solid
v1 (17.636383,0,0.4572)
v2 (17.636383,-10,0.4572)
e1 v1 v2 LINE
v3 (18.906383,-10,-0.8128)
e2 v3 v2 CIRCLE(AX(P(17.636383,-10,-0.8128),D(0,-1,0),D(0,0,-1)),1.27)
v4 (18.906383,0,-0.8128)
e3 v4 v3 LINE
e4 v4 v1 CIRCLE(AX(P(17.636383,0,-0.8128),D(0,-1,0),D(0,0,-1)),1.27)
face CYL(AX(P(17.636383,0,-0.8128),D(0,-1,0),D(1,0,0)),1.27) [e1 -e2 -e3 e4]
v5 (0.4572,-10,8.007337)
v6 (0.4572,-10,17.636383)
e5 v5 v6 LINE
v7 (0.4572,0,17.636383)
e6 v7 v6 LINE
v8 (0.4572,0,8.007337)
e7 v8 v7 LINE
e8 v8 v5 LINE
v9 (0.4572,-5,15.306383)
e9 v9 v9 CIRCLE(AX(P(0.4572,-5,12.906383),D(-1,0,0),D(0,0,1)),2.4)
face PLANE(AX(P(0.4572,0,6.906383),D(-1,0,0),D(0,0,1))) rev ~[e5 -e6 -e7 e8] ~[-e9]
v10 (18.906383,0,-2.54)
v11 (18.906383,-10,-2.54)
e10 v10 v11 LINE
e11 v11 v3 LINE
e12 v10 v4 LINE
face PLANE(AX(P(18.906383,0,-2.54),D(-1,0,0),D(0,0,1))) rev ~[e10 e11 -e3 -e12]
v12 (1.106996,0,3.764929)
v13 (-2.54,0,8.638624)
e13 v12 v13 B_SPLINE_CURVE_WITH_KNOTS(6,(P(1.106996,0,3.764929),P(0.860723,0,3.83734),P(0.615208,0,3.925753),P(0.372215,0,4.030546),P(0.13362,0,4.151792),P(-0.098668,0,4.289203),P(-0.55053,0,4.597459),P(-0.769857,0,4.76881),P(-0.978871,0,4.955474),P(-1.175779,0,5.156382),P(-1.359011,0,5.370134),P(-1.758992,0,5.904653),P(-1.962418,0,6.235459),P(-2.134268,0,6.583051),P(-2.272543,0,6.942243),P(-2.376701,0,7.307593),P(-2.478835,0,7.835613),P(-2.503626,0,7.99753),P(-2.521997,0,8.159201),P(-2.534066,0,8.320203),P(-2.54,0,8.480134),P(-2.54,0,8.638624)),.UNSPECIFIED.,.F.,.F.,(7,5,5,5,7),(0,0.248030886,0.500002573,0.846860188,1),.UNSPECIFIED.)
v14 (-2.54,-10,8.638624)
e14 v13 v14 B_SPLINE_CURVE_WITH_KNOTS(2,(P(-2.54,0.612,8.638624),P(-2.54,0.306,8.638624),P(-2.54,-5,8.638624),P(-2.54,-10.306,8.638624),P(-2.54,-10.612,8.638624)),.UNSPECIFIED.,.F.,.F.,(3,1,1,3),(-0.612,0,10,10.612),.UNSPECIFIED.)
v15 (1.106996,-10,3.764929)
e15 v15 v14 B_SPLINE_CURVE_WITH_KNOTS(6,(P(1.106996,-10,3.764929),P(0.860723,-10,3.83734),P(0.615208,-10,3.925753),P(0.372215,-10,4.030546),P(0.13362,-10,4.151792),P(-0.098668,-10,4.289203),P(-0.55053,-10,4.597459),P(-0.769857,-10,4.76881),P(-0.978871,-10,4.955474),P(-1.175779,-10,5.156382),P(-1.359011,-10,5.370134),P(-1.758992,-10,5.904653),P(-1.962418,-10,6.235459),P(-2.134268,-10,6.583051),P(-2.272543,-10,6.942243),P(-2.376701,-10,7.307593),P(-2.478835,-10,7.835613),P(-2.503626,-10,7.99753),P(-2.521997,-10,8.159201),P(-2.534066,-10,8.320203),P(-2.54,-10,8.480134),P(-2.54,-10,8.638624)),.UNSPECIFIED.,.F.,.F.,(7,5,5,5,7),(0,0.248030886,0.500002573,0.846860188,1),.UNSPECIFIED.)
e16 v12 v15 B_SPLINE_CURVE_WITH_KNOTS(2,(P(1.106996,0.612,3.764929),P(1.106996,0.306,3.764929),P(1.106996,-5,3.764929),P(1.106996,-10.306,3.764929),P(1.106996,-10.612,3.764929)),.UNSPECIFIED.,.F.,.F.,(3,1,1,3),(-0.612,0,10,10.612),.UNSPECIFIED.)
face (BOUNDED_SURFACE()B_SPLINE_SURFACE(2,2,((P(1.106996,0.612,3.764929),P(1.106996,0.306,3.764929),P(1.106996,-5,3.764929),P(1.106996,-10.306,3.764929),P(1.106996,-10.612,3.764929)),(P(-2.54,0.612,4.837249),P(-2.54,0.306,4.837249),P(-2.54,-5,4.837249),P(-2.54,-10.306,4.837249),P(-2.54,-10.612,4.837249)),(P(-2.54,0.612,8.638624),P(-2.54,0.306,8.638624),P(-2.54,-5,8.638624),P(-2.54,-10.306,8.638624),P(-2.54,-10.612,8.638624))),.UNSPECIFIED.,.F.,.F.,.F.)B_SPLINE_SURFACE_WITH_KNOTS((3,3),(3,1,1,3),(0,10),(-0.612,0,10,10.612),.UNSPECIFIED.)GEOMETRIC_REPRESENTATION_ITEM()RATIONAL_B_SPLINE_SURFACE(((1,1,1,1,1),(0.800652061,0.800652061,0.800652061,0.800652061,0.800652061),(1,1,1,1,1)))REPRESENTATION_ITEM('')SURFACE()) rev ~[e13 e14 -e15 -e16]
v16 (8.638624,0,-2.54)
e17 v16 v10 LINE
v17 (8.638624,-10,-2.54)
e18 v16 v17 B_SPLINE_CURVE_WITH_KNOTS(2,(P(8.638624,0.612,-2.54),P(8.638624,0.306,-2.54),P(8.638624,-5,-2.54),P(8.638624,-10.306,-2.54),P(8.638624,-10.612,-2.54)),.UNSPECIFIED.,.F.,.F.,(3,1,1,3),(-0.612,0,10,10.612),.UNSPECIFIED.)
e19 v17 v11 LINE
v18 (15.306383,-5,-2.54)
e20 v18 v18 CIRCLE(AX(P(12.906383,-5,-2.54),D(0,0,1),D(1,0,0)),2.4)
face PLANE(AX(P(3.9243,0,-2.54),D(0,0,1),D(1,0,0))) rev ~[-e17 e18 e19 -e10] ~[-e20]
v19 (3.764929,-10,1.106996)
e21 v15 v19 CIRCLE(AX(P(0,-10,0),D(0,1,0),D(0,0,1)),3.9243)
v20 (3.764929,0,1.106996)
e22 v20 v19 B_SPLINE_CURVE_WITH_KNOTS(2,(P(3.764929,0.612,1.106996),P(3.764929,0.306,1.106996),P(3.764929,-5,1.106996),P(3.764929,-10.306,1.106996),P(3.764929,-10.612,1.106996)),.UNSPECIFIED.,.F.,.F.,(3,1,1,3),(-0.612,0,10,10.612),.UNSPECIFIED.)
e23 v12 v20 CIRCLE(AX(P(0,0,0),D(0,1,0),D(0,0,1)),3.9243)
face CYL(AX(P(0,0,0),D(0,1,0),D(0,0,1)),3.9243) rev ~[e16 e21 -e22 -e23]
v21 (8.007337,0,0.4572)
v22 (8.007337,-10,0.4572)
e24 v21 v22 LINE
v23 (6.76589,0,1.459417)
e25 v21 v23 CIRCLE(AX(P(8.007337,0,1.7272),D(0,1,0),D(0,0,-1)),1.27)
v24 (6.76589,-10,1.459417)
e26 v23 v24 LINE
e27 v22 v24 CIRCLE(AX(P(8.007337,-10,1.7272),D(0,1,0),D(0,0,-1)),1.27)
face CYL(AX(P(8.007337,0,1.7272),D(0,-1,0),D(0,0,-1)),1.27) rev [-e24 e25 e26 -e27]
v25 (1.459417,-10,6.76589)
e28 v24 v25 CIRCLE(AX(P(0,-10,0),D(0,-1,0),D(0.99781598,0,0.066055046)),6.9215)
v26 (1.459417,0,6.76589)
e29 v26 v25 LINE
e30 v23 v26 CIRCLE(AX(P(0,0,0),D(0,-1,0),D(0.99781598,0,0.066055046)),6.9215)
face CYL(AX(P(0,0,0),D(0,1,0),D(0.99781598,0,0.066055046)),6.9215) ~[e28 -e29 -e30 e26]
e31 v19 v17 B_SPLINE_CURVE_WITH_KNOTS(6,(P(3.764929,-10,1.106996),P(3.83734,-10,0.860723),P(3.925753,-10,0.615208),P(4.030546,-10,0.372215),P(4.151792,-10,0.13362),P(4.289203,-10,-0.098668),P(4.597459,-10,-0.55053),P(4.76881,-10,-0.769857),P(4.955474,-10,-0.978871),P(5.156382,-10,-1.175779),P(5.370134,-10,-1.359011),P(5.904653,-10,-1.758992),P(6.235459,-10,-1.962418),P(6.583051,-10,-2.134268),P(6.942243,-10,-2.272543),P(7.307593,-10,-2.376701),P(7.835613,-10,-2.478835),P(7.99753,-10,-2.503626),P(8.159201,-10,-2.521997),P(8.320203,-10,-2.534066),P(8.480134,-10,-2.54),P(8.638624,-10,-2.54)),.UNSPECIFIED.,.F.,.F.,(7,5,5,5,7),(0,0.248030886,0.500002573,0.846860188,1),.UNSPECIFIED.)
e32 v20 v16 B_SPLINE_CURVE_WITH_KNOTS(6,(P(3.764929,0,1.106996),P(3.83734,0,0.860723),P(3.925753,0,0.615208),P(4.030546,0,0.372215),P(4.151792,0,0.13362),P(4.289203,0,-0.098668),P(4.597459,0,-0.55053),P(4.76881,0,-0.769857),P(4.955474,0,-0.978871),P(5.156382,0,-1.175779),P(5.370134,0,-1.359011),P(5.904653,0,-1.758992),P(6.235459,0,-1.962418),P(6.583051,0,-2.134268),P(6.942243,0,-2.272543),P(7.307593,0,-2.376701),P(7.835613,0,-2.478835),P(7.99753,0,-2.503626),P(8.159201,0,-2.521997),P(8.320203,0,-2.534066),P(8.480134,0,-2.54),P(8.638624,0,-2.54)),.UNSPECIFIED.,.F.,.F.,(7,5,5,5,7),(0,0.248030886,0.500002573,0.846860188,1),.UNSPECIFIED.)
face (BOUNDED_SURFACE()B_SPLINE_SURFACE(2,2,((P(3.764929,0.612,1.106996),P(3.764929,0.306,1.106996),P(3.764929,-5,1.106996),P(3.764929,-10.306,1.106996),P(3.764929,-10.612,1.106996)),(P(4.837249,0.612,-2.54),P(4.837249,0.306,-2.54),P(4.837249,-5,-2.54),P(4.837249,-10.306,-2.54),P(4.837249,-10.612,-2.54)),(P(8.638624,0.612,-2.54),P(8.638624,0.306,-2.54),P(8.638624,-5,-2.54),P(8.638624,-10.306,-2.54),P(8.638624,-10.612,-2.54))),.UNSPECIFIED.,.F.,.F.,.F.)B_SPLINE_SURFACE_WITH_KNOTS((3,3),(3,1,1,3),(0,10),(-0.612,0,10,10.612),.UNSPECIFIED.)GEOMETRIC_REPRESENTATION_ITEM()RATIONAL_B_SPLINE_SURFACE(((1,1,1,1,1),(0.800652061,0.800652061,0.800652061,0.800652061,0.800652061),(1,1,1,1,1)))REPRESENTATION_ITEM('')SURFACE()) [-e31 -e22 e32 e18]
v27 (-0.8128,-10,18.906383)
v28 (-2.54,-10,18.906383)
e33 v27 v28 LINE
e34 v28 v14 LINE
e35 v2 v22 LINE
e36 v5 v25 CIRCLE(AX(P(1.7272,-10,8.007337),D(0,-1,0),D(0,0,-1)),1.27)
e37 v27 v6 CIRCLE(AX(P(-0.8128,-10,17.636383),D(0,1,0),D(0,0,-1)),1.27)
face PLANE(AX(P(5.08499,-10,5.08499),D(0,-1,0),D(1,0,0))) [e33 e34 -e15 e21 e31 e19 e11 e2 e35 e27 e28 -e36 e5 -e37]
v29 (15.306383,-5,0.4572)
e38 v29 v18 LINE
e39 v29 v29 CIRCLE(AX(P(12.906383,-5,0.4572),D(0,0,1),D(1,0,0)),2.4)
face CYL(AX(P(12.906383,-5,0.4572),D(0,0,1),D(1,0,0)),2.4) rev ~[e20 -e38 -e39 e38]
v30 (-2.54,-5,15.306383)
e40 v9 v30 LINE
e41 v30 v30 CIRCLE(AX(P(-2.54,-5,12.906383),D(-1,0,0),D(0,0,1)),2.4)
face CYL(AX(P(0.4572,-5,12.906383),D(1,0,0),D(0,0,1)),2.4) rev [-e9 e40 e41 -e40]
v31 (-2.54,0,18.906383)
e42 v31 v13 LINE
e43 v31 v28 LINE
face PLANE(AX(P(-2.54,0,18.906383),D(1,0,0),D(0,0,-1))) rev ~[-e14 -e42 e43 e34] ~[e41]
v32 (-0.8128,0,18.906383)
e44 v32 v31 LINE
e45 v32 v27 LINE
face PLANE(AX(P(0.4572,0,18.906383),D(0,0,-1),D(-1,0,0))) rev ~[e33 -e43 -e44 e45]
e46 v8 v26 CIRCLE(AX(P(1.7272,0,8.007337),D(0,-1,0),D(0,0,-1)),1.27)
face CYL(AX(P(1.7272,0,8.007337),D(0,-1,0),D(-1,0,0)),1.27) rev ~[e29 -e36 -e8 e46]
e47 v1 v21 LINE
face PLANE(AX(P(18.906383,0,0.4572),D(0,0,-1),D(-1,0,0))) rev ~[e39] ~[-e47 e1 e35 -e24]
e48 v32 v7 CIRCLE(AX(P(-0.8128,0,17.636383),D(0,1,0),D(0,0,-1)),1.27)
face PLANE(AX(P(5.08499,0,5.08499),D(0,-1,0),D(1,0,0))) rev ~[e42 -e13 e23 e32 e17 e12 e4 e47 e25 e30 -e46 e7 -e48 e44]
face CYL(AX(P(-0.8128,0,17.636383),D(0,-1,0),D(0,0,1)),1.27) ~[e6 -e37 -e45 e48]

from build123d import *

# Parameters (mm, degrees)
F1_DEPTH = 10
F2_R     = 2.4
F3_DEPTH = 2.9972
F7_R     = 5.08
F8_R     = 1.27


# Not quite as in the source:
# - a pattern or mirror of a feature is missing from the dataset's text; its kind, count and spacing are read off the source's solid


with BuildPart() as f1:
    # F0 (on Front) → F1 (new body)
    with BuildSketch(Plane.XZ):
        with BuildLine():
            ThreePointArc((0, 3.9243), (2.7748991414, 2.7748991414), (3.9243, 0))
            Line((3.9243, 0), (3.9243, -2.54))
            Line((3.9243, -2.54), (18.9063833089, -2.54))
            Line((18.9063833089, -2.54), (18.9063833089, 0.4572))
            Line((18.9063833089, 0.4572), (6.9063833089, 0.4572))
            ThreePointArc((6.9063833089, 0.4572), (4.894239586, 4.894239586), (0.4572, 6.9063833089))
            Line((0.4572, 6.9063833089), (0.4572, 18.9063833089))
            Line((0.4572, 18.9063833089), (-2.54, 18.9063833089))
            Line((-2.54, 18.9063833089), (-2.54, 3.9243))
            Line((-2.54, 3.9243), (0, 3.9243))
        make_face()
    extrude(amount=F1_DEPTH)

    # F2 (on face) → F3 (cut, through all)
    with BuildSketch(Plane.XY.offset(0.4572)):
        with Locations((12.9063833089, -5)):
            Circle(F2_R)
    f3 = extrude(amount=-F3_DEPTH, mode=Mode.SUBTRACT)

    # F3_copies: F3 across plane
    add(f3.mirror(Plane(origin=(0, 0, 0), x_dir=(-0.7071067812, 0, -0.7071067812), z_dir=(-0.7071067812, 0, 0.7071067812))), mode=Mode.SUBTRACT)

    # F7
    f7_edges = [f1.edges().sort_by_distance(p)[0] for p in [
        (-2.54, -5, 3.9243),
        (3.9243, -5, -2.54),
    ]]
    fillet(f7_edges, radius=F7_R)

    # F8
    f8_edges = [f1.edges().sort_by_distance(p)[0] for p in [
        (0.4572, -5, 18.906383),
        (0.4572, -5, 6.906383),
        (6.906383, -5, 0.4572),
        (18.906383, -5, 0.4572),
    ]]
    fillet(f8_edges, radius=F8_R)


solid = f1.part
